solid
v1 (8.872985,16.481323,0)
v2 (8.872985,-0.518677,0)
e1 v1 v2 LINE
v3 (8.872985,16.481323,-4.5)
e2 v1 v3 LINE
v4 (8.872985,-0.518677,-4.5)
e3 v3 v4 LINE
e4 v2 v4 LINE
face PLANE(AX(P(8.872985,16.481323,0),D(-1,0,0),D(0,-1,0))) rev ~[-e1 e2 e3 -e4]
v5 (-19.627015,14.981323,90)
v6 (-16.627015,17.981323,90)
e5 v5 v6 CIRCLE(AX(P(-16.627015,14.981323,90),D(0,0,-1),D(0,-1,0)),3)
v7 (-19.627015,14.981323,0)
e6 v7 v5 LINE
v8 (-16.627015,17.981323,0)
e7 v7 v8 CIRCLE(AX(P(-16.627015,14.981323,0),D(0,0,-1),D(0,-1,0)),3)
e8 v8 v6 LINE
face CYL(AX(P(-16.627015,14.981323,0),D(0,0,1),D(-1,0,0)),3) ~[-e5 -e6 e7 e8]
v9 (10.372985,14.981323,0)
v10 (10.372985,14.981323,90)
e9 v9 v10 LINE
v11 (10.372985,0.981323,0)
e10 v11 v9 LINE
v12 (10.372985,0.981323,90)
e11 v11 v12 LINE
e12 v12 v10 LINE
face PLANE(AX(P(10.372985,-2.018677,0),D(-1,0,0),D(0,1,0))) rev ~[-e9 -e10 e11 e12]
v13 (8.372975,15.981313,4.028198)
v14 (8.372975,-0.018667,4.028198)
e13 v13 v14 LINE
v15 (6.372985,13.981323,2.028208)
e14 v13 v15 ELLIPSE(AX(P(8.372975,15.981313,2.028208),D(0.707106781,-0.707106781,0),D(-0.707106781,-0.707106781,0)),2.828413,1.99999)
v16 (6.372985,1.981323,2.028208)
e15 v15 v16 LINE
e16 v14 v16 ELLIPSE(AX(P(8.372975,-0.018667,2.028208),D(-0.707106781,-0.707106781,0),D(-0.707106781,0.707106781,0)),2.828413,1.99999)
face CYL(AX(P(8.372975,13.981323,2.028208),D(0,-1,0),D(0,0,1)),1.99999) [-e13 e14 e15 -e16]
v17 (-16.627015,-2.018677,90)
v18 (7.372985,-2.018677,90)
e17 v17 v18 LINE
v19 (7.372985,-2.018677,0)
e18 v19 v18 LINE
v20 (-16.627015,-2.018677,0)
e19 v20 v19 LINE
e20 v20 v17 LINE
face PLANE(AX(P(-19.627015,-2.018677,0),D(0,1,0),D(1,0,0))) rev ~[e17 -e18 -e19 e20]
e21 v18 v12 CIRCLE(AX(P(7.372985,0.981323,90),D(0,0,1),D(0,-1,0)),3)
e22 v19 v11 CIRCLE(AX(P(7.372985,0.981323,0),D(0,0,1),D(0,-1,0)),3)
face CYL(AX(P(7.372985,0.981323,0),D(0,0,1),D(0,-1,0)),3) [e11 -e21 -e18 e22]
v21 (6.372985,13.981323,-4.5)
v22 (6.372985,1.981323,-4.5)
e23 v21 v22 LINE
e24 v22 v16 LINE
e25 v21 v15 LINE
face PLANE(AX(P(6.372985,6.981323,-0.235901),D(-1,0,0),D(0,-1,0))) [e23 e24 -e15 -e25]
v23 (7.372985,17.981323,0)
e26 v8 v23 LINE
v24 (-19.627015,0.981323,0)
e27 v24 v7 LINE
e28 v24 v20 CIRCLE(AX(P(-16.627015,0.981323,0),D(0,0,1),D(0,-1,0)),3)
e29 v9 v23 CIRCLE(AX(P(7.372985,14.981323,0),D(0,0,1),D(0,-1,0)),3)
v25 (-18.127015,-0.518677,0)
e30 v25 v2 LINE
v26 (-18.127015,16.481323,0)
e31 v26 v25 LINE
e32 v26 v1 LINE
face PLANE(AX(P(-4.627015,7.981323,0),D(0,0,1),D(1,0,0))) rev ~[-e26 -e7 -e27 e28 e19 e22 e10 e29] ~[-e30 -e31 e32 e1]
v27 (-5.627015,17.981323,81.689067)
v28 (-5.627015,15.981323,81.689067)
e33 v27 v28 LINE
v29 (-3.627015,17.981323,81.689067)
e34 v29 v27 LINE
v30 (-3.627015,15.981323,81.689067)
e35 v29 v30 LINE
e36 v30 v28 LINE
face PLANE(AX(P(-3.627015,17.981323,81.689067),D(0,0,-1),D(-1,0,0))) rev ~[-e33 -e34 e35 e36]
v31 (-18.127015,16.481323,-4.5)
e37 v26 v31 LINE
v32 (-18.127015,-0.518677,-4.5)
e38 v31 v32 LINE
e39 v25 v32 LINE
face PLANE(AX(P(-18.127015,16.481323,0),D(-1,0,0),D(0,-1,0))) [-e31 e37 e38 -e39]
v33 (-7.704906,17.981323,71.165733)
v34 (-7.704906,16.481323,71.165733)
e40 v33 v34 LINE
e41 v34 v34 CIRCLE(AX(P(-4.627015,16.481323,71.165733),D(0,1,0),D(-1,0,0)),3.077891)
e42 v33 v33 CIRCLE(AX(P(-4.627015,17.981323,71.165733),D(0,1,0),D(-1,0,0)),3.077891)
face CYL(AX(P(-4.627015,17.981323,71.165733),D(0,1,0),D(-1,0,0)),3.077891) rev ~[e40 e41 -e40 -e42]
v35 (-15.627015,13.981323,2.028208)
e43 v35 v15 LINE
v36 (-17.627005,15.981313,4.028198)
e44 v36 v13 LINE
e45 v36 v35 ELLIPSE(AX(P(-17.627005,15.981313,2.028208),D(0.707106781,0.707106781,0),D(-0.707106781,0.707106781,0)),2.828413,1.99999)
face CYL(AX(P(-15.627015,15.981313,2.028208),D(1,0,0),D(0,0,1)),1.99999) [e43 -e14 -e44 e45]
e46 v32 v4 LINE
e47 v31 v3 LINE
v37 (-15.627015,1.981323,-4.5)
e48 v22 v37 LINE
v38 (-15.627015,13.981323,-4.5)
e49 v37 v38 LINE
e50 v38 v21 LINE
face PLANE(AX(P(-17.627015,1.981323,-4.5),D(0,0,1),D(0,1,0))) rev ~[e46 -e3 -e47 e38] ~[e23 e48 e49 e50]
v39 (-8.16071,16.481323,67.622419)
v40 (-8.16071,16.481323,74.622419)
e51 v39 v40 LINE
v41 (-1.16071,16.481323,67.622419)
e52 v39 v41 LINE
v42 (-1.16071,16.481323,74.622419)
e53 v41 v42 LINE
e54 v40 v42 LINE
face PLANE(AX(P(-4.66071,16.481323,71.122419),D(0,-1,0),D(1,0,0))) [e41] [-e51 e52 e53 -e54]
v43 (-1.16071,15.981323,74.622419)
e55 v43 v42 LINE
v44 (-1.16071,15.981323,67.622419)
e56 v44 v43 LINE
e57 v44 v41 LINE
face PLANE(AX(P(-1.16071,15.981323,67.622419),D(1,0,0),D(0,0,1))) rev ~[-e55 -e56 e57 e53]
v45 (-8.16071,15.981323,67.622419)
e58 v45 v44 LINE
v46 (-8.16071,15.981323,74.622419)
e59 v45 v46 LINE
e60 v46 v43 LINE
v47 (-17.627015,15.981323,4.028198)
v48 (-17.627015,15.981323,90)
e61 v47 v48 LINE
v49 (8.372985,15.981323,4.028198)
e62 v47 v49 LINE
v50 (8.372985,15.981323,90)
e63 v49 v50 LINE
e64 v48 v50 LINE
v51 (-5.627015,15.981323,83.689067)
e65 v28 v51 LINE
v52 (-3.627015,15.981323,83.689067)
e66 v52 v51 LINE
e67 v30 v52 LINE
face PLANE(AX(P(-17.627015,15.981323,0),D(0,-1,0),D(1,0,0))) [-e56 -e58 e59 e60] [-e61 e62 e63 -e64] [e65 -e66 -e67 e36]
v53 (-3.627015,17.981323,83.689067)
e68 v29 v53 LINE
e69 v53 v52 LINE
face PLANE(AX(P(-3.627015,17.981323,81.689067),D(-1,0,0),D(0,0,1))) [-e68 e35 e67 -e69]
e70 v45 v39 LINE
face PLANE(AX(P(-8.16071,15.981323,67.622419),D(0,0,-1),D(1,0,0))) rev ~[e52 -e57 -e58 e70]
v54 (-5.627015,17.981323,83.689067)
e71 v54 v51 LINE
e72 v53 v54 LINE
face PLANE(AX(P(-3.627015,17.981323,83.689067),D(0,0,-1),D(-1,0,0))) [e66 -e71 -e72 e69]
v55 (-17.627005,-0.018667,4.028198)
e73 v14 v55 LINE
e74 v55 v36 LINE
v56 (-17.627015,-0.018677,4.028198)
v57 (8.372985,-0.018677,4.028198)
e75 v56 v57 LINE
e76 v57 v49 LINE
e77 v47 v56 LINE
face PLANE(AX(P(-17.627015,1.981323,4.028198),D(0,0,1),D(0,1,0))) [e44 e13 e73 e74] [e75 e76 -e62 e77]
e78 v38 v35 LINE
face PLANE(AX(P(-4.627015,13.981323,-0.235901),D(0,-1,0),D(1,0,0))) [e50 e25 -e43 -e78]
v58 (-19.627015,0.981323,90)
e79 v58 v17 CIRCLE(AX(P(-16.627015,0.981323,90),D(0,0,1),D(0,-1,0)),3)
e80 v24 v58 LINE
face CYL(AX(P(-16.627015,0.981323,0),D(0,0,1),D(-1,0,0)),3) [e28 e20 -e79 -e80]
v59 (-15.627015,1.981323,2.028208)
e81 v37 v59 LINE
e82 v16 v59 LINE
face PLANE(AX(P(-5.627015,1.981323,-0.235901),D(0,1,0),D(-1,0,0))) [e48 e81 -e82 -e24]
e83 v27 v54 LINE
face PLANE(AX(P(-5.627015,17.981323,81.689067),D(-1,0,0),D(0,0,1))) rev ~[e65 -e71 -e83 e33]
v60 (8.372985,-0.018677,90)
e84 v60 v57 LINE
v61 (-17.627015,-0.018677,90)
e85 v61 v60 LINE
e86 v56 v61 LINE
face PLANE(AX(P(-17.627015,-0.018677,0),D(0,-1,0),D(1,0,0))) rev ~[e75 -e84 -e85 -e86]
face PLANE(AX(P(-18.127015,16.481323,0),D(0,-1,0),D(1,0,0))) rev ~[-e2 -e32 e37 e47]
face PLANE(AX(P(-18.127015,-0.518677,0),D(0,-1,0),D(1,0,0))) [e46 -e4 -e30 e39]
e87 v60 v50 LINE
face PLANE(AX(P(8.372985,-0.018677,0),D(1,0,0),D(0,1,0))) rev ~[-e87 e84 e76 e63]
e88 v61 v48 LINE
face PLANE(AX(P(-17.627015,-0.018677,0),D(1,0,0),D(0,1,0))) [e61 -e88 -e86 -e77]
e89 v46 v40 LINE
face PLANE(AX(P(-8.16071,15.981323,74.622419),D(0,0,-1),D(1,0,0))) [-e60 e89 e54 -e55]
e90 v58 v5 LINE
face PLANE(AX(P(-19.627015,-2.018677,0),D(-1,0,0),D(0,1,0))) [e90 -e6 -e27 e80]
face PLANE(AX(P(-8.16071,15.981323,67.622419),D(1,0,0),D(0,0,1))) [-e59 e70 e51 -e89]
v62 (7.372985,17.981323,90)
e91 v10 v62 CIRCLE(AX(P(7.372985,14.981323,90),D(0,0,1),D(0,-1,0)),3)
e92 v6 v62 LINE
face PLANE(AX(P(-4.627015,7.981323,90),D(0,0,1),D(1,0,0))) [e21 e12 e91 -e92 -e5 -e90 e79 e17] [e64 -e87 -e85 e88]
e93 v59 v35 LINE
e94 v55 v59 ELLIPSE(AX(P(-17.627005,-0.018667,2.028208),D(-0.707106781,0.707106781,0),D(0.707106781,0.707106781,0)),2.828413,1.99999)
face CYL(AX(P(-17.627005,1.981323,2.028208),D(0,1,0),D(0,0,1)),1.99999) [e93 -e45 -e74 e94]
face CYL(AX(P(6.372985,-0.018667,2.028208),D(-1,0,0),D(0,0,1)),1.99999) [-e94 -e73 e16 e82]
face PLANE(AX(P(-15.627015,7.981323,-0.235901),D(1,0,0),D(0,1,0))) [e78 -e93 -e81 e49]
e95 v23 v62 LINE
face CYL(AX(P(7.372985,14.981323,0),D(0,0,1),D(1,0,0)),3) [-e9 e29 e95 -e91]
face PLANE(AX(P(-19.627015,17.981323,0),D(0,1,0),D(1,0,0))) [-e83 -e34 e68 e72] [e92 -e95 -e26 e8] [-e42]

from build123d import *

# Parameters (mm, degrees)
F0_W      = 30
F0_H      = 20
F1_DEPTH  = 90
F2_R      = 3
F3_W      = 26
F3_H      = 16
F4_DEPTH  = 100
F5_W      = 27
F5_H      = 17
F6_DEPTH  = 4.5
F7_DEPTH  = 5
F8_R      = 3.0778907451
F8_W      = 2
F8_H      = 2
F9_DEPTH  = 2
F10_W     = 7
F10_H     = 7
F11_DEPTH = 0.5
F12_W     = 26
F12_H     = 8.5281978436
F13_DEPTH = 2
F14_W     = 14
F14_H     = 8.5281978436
F15_DEPTH = 2
F16_W     = 24
F16_H     = 8.5281978436
F17_DEPTH = 2
F18_W     = 12
F18_H     = 8.5281978436
F19_DEPTH = 2
F20_R     = 1.99999


# Not quite as in the source:
# - a fillet or chamfer is up to 0.001 mm smaller than in the source, because OpenCascade refuses the exact size


with BuildPart() as f1:
    # F0 (on Top) → F1 (new body)
    with BuildSketch(Plane.XY):
        with Locations((-4.6270154417, 7.9813233296)):
            Rectangle(F0_W, F0_H)
    extrude(amount=F1_DEPTH)

    # F2
    f2_edges = [f1.edges().sort_by_distance(p)[0] for p in [
        (-19.627015, -2.018677, 45),
        (-19.627015, 17.981323, 45),
        (10.372985, -2.018677, 45),
        (10.372985, 17.981323, 45),
    ]]
    fillet(f2_edges, radius=F2_R)

    # F3 (on face) → F4 (cut)
    with BuildSketch(Plane.XY.offset(90)):
        with Locations((-4.6270154417, 7.9813233296)):
            Rectangle(F3_W, F3_H)
    extrude(amount=-F4_DEPTH, mode=Mode.SUBTRACT)

    # F5 (on face) → F6 (join)
    with BuildSketch(Plane(origin=(0, 0, 0), x_dir=(1, 0, 0), z_dir=(0, 0, -1))):
        with Locations((-4.6270154417, -7.9813233296)):
            Rectangle(F5_W, F5_H)
    extrude(amount=F6_DEPTH)

    # F7 (cut): a face of the model
    f7_faces = [f1.faces().sort_by_distance(p)[0] for p in [
        (-4.6270154417, 7.9813233296, 0),
    ]]
    extrude(f7_faces, amount=-F7_DEPTH, mode=Mode.SUBTRACT)

    # F8 (on face) → F9 (cut)
    with BuildSketch(Plane(origin=(0, 17.9813233296, 0), x_dir=(-1, 0, 0), z_dir=(0, 1, 0))):
        with Locations((4.6270154417, 71.1657330394)):
            Circle(F8_R)
        with Locations((4.6270154417, 82.6890671849)):
            Rectangle(F8_W, F8_H)
    extrude(amount=-F9_DEPTH, mode=Mode.SUBTRACT)

    # F10 (on face) → F11 (cut)
    with BuildSketch(Plane.XZ.offset(-15.9813233296)):
        with Locations((-4.6607098193, 71.1224186855)):
            Rectangle(F10_W, F10_H)
    extrude(amount=-F11_DEPTH, mode=Mode.SUBTRACT)

    # F12 (on face) → F13 (join)
    with BuildSketch(Plane.XZ.offset(-15.9813233296)):
        with Locations((-4.6270154417, -0.2359010782)):
            Rectangle(F12_W, F12_H)
    extrude(amount=F13_DEPTH)

    # F14 (on face) → F15 (join)
    with BuildSketch(Plane(origin=(8.3729845583, 0, 0), x_dir=(0, -1, 0), z_dir=(-1, 0, 0))):
        with Locations((-6.9813233296, -0.2359010782)):
            Rectangle(F14_W, F14_H)
    extrude(amount=F15_DEPTH)

    # F16 (on face) → F17 (join)
    with BuildSketch(Plane(origin=(0, -0.0186766704, 0), x_dir=(-1, 0, 0), z_dir=(0, 1, 0))):
        with Locations((5.6270154417, -0.2359010782)):
            Rectangle(F16_W, F16_H)
    extrude(amount=F17_DEPTH)

    # F18 (on face) → F19 (join)
    with BuildSketch(Plane.YZ.offset(-17.6270154417)):
        with Locations((7.9813233296, -0.2359010782)):
            Rectangle(F18_W, F18_H)
    extrude(amount=F19_DEPTH)

    # F20 (radius 2 in the source; OpenCascade refuses exactly that, so slightly less here)
    f20_edges = [f1.edges().sort_by_distance(p)[0] for p in [
        (-15.627015, 7.981323, 4.028198),
        (-4.627015, 1.981323, 4.028198),
        (6.372985, 7.981323, 4.028198),
        (-4.627015, 13.981323, 4.028198),
    ]]
    fillet(f20_edges, radius=F20_R)


solid = f1.part
